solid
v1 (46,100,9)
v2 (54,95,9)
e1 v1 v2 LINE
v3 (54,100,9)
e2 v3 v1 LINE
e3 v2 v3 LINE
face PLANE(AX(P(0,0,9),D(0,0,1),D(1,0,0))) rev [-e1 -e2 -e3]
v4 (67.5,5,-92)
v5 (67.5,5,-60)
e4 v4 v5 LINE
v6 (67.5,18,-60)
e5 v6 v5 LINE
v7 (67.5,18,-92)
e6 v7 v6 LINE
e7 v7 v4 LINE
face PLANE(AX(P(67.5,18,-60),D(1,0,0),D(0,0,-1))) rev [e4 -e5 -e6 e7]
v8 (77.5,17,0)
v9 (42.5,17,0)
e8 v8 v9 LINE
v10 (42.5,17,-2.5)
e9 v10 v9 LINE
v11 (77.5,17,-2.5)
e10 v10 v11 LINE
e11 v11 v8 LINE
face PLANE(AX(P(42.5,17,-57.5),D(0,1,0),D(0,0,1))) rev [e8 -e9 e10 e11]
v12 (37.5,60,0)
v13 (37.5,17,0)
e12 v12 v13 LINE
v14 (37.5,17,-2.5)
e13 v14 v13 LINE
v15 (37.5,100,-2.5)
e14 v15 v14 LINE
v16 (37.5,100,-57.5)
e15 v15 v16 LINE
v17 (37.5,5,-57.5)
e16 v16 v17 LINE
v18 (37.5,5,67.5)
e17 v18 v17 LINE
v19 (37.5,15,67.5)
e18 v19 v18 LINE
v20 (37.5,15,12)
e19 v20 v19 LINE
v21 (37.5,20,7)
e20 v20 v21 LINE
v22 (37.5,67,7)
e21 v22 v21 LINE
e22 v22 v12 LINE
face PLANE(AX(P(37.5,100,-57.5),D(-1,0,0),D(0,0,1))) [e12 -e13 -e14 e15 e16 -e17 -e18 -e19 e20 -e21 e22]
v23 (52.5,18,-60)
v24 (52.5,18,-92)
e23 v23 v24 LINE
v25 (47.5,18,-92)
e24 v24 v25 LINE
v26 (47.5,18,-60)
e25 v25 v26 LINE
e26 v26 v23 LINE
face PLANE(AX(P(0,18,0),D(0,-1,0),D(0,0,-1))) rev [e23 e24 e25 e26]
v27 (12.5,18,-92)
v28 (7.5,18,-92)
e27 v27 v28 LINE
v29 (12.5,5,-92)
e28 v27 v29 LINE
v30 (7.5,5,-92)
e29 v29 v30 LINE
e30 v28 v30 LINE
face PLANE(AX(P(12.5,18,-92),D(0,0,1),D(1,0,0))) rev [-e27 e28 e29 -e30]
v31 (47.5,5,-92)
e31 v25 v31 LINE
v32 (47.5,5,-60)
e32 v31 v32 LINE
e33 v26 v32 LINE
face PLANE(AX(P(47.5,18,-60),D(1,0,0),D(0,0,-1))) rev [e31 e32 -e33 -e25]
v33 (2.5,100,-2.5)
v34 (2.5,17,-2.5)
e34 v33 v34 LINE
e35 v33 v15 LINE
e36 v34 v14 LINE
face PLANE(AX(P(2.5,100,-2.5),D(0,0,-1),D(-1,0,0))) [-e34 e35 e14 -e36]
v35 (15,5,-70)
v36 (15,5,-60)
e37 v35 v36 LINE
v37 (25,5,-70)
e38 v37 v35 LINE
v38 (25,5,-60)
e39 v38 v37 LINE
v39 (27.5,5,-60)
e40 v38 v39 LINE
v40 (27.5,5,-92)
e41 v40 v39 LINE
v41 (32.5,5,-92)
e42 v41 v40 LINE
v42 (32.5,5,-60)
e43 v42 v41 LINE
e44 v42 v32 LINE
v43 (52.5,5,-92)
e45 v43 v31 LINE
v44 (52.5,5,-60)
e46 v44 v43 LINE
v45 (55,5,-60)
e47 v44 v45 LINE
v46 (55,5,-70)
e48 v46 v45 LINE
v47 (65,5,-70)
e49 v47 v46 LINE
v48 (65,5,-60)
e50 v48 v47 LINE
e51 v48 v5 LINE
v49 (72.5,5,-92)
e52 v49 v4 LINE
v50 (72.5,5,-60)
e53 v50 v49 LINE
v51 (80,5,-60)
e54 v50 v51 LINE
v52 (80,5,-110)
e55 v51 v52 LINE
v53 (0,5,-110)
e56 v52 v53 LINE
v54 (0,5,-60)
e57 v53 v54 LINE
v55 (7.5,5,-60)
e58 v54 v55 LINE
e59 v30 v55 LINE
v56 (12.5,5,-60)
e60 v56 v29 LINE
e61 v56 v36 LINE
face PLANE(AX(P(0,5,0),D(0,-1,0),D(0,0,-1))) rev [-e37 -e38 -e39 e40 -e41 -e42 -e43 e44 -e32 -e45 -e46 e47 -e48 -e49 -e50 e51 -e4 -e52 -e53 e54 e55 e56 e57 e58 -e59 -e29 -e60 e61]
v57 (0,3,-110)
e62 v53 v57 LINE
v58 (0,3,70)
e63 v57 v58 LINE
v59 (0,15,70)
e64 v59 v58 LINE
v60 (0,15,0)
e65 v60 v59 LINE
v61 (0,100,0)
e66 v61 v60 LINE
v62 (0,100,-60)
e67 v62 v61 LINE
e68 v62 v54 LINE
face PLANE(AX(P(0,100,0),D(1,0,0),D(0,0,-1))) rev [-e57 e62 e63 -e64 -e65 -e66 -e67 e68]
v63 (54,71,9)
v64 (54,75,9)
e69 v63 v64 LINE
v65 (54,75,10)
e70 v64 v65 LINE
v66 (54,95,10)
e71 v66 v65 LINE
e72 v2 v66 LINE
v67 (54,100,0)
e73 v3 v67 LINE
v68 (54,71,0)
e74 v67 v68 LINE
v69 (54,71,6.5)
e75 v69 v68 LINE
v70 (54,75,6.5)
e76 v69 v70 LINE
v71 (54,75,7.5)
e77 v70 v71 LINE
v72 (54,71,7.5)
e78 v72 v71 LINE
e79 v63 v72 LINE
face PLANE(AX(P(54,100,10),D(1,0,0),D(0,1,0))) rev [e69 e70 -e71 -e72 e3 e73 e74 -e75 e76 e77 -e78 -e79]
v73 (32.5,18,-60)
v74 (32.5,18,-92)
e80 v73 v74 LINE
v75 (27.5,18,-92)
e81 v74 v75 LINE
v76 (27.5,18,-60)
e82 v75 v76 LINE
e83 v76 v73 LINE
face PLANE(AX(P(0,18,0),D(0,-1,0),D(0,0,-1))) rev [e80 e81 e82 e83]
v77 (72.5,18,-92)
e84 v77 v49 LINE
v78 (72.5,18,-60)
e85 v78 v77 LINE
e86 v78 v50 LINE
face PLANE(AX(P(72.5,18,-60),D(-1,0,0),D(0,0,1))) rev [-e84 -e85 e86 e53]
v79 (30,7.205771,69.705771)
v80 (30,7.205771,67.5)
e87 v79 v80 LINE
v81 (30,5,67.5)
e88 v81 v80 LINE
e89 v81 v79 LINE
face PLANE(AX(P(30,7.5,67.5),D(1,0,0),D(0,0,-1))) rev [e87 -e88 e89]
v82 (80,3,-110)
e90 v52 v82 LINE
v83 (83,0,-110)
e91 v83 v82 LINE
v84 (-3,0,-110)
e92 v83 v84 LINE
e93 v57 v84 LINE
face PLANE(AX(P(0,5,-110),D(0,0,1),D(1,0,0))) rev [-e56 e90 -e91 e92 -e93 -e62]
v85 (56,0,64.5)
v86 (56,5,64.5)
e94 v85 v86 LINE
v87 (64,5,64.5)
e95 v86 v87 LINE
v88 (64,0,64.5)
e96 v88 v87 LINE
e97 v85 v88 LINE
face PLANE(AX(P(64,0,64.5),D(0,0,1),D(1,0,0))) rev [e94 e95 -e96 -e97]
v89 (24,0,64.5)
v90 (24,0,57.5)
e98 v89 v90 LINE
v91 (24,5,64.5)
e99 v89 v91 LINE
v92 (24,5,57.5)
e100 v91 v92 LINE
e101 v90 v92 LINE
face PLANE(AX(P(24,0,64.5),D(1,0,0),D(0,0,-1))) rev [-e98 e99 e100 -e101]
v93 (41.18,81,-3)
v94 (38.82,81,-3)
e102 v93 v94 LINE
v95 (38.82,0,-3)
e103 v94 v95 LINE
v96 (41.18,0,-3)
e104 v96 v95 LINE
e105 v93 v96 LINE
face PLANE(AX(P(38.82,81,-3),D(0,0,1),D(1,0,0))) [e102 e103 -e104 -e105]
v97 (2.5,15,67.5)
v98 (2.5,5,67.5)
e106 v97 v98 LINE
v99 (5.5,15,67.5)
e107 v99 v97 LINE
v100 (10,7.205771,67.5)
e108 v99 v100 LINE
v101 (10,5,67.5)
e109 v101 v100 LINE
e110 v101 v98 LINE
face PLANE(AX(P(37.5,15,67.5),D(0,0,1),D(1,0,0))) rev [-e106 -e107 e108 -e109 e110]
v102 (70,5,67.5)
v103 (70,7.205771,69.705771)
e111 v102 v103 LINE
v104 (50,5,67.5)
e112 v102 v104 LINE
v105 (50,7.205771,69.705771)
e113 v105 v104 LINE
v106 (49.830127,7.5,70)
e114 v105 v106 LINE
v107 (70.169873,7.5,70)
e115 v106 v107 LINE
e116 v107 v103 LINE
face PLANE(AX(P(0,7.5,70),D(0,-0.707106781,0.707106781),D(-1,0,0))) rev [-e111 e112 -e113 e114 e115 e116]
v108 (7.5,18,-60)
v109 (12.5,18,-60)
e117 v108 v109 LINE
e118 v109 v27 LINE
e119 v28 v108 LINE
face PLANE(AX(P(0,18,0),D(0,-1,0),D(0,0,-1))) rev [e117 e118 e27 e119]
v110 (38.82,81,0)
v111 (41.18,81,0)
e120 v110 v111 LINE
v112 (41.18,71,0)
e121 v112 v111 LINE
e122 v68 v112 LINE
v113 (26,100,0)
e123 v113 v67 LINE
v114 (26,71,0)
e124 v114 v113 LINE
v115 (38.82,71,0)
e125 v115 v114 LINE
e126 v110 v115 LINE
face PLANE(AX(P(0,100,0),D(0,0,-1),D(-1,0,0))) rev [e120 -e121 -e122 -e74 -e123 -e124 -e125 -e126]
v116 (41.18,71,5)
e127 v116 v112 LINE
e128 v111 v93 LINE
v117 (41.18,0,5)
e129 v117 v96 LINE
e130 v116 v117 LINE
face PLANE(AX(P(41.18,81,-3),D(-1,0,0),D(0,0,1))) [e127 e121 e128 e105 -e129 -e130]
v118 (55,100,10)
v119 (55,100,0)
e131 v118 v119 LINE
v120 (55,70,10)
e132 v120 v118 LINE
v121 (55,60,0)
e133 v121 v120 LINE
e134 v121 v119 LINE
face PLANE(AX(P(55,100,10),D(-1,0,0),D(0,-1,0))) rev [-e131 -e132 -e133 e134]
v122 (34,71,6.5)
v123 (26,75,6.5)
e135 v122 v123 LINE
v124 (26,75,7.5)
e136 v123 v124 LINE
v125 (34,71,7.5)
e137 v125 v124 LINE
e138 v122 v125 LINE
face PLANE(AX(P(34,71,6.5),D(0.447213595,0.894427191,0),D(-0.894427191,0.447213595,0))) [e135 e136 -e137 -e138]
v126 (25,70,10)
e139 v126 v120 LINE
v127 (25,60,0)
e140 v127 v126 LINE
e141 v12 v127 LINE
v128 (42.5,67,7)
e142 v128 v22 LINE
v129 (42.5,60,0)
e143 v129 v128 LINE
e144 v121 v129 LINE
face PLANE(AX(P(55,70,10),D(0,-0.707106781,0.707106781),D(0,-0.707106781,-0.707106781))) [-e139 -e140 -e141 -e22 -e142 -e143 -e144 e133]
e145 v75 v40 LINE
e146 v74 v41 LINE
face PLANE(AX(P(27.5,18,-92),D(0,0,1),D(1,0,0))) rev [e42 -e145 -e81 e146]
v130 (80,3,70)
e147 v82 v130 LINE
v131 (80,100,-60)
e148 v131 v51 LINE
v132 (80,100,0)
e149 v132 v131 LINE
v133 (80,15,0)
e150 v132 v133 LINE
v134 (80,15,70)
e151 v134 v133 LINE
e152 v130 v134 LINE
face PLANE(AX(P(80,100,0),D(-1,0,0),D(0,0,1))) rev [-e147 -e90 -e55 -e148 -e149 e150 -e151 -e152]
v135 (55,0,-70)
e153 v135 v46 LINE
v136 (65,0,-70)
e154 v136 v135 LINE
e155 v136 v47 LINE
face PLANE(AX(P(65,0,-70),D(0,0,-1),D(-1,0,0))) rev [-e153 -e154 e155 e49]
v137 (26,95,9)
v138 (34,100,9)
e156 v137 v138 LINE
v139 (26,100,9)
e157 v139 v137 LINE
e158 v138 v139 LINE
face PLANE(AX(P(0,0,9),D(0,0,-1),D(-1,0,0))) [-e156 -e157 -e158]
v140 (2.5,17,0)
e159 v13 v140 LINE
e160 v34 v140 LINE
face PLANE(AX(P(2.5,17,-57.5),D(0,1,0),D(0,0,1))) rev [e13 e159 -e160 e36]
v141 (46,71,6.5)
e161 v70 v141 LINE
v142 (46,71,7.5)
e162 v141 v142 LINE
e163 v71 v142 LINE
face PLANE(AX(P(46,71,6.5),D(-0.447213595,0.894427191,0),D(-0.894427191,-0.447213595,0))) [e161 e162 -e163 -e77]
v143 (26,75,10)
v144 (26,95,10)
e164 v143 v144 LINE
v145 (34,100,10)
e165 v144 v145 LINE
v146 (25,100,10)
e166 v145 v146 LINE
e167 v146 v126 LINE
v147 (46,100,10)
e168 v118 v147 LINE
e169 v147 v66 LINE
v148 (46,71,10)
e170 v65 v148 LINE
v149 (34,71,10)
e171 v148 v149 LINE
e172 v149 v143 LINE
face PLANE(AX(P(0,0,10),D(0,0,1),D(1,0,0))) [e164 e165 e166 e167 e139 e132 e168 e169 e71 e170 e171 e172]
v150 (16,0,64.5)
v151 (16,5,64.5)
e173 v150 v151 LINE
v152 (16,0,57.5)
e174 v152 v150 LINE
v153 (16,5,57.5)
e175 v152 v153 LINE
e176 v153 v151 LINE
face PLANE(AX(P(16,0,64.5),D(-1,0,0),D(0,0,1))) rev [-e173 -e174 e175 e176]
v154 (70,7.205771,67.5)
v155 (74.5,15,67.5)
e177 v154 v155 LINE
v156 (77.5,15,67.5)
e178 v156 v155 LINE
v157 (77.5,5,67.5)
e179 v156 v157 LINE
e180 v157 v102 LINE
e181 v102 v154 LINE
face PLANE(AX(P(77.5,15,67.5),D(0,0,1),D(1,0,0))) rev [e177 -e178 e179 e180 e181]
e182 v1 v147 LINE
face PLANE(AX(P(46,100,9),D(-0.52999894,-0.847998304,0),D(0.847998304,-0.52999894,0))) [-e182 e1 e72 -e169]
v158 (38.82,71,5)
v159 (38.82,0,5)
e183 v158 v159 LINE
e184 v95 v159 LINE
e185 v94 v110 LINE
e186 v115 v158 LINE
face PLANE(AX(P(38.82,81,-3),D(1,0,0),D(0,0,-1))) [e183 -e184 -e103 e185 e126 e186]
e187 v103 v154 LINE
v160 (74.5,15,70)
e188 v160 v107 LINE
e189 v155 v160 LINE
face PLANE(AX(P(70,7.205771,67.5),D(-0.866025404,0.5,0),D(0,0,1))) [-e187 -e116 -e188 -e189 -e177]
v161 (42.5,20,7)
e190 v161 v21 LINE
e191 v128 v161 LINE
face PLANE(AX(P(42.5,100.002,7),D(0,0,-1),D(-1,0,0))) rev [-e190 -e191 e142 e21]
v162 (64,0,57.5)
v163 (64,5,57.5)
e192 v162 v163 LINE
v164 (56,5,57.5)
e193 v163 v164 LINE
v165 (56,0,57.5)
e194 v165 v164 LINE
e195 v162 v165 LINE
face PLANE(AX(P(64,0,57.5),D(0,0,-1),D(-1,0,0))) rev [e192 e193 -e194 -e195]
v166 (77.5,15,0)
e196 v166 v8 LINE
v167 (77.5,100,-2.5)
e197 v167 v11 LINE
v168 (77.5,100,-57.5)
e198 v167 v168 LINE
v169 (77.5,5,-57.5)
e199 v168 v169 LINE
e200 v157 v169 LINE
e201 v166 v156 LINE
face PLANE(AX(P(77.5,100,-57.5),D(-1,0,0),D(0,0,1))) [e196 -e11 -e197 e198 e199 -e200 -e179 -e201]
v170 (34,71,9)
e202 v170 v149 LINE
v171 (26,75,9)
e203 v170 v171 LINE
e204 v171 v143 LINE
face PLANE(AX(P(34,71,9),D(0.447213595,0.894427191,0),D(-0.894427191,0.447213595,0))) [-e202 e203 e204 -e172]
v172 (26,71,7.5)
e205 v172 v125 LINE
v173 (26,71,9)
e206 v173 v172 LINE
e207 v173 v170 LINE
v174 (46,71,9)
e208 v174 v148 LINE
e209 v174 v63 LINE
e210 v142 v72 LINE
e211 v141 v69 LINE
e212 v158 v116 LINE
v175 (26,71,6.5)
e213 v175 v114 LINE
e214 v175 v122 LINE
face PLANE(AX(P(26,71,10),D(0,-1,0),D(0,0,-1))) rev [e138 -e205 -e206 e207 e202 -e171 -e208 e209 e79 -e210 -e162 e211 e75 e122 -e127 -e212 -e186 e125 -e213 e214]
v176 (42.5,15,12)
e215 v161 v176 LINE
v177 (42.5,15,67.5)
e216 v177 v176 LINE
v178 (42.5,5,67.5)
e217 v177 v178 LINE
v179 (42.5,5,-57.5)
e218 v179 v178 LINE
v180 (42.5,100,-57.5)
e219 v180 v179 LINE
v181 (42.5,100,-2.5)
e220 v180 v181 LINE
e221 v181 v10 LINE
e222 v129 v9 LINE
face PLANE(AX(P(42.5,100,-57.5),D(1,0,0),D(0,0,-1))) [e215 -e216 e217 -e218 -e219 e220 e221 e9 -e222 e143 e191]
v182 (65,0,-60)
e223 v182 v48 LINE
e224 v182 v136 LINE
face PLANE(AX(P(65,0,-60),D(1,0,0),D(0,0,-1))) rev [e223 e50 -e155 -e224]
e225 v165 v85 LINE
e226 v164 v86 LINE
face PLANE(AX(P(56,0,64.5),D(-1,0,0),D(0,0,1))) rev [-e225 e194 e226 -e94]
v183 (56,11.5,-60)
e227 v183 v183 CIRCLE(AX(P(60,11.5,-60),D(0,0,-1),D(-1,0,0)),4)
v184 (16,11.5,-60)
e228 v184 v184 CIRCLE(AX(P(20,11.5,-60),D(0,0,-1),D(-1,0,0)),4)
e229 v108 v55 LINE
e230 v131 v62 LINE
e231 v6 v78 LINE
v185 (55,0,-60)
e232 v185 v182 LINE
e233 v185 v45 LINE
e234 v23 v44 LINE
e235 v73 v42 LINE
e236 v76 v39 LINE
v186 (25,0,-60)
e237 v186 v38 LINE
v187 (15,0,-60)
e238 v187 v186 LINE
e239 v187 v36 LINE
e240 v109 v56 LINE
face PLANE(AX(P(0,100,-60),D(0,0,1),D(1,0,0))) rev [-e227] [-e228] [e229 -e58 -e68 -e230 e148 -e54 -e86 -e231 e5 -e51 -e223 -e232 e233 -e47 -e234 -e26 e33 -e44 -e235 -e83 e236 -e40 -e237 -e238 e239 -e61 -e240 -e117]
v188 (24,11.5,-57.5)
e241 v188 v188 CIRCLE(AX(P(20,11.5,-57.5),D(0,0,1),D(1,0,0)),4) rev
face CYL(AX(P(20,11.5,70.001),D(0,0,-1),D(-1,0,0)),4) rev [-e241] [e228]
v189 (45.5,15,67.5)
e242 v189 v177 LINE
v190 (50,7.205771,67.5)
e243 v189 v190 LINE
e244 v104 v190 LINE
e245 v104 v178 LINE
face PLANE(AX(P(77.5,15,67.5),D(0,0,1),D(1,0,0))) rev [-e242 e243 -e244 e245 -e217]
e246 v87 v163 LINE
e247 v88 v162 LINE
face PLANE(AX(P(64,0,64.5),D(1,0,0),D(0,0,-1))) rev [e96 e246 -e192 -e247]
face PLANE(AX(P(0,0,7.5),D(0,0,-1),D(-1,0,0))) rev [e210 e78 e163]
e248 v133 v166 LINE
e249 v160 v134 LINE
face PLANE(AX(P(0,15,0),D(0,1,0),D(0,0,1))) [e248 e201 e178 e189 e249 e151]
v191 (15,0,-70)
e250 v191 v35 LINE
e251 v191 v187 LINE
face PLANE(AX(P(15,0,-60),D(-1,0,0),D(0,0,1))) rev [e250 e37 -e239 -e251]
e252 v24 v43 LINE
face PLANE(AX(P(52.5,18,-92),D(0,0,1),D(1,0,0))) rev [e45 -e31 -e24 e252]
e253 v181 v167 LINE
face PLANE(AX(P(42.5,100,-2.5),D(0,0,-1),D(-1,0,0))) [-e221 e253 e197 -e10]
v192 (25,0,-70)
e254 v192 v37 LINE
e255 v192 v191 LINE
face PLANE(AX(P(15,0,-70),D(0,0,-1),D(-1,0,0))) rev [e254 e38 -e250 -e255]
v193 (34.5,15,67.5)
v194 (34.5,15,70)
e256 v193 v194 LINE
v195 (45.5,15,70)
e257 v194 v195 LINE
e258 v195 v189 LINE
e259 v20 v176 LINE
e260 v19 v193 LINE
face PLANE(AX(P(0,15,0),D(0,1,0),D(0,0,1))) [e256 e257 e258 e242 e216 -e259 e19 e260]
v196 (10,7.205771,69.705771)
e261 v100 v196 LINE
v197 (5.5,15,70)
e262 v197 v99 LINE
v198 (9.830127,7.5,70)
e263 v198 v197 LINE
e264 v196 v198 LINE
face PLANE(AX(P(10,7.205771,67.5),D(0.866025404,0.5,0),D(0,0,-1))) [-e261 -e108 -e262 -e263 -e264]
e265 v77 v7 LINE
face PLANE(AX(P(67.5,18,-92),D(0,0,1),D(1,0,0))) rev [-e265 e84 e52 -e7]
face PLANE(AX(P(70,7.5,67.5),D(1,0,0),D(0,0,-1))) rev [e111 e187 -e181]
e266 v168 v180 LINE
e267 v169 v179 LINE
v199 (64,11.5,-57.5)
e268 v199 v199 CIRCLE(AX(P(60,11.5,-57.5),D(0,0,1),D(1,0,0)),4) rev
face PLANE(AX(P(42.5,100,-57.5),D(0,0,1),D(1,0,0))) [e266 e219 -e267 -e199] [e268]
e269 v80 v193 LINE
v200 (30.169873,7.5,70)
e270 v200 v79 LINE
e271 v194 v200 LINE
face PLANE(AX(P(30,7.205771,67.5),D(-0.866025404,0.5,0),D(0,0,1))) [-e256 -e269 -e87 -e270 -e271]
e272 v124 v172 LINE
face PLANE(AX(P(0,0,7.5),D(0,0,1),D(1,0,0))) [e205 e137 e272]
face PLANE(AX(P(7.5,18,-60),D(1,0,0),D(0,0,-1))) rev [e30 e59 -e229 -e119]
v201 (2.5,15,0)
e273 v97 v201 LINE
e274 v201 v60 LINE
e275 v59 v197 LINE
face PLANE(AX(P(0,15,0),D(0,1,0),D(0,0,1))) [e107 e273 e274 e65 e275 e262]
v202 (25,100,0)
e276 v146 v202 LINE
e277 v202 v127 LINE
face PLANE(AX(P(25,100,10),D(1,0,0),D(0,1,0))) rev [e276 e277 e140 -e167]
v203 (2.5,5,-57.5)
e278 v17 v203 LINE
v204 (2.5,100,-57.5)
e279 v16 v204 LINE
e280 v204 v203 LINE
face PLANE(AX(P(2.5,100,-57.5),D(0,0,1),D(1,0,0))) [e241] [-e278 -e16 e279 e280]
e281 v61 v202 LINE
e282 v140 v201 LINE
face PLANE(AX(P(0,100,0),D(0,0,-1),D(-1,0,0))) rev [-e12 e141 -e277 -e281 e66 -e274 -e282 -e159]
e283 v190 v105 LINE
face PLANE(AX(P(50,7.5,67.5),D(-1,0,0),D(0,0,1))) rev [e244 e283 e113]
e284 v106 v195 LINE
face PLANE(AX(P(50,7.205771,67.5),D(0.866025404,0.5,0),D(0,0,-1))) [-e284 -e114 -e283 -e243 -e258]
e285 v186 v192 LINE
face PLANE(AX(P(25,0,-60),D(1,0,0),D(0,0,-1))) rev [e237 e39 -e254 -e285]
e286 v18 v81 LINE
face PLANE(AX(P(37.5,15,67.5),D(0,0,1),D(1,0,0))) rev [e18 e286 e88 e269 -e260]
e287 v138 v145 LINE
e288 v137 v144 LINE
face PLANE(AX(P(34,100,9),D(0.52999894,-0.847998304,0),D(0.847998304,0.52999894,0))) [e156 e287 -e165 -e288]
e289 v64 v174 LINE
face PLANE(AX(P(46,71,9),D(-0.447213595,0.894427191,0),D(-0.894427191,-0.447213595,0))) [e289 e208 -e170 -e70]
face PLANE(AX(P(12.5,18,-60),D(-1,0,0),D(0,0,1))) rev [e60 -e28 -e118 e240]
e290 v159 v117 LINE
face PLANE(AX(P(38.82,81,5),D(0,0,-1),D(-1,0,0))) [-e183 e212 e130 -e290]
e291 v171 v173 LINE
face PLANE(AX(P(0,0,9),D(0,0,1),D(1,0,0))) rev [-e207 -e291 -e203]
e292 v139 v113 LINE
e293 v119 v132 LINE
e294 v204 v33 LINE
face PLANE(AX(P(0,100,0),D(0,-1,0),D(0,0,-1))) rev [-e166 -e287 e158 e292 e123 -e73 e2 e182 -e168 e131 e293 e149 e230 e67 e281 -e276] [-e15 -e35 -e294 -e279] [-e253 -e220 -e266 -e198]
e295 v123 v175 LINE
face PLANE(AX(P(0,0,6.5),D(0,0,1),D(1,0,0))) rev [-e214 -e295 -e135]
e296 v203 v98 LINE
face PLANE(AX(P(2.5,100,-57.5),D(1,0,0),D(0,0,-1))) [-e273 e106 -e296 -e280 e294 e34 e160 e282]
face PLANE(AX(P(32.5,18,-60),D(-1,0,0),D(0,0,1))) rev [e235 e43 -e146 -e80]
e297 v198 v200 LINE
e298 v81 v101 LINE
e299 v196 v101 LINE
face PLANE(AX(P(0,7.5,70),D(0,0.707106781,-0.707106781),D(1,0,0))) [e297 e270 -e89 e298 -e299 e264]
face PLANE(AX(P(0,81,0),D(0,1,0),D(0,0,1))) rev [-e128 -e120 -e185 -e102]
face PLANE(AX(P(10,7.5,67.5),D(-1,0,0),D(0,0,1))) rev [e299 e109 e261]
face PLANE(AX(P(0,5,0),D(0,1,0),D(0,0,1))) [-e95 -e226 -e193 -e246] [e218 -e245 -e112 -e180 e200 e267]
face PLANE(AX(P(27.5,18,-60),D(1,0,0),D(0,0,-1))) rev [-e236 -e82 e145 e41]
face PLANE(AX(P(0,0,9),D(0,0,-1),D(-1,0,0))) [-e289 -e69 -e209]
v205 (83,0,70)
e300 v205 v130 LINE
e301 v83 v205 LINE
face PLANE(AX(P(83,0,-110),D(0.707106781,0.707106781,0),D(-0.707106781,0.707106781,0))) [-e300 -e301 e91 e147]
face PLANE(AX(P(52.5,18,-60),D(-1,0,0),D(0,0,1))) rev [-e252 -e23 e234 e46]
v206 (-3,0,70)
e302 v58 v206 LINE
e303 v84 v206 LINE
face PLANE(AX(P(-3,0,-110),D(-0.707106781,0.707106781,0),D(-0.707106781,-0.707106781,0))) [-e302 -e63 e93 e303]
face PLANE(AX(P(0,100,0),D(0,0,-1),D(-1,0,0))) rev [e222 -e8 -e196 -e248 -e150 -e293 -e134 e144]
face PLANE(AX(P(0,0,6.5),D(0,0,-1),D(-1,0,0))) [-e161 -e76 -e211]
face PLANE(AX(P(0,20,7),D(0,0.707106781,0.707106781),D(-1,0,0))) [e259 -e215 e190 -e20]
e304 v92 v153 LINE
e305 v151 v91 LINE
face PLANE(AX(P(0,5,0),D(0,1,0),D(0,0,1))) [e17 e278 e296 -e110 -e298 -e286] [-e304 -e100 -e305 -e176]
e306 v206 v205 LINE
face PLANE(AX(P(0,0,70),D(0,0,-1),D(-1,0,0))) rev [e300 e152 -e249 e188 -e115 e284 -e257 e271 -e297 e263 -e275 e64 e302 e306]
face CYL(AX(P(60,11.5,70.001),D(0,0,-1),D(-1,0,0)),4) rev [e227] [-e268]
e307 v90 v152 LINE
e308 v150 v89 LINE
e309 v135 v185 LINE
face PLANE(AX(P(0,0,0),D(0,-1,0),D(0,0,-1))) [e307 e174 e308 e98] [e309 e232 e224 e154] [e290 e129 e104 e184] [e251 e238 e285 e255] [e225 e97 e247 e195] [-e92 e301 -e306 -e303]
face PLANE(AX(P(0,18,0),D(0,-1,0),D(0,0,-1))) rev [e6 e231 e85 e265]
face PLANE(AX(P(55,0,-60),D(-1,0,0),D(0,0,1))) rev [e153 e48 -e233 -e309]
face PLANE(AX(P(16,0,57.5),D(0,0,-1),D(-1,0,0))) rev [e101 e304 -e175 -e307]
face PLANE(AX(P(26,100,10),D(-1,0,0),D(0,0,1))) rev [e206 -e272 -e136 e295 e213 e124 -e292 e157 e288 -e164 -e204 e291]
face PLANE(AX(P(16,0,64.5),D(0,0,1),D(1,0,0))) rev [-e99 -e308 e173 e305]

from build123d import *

# Parameters (mm, degrees)
SKETCH1_W                                 = 80
SKETCH1_H                                 = 60
BOSS_EXTRUDE1_DEPTH                       = 100
CUT_EXTRUDE1_START                        = 5
SKETCH2_W                                 = 35
SKETCH2_H                                 = 55
CUT_EXTRUDE1_DEPTH                        = 95
SKETCH3_W                                 = 80
SKETCH3_H                                 = 5
BOSS_EXTRUDE2_DEPTH                       = 70
BOSS_EXTRUDE3_DEPTH                       = 10
SKETCH5_W                                 = 20
SKETCH5_H                                 = 2.5
CUT_EXTRUDE2_DEPTH                        = 7.5
SKETCH6_W                                 = 35
SKETCH6_H                                 = 12
CUT_EXTRUDE4_DEPTH                        = 57.5
CUT_EXTRUDE6_REACH                        = 184.483
SKETCH7_R                                 = 4
SKETCH9_W                                 = 80
SKETCH9_H                                 = 50
BOSS_EXTRUDE4_DEPTH                       = 5
SKETCH13_W                                = 8
SKETCH13_H                                = 7
CUT_EXTRUDE8_BUTTON_HOLES_DEPTH           = 166.90660023
BOSS_EXTRUDE5_OLED_MOUNT_DEPTH            = 10
BOSS_EXTRUDE6_OLED_MOUNT_DEPTH            = 1
BOSS_EXTRUDE7_START                       = -2.5
BOSS_EXTRUDE7_OLED_MOUNT_DEPTH            = 1
BOSS_EXTRUDE8_OLED_MOUNT_DEPTH            = 1
BOSS_EXTRUDE13_OLED_MOUNT_SUPPORT_DEPTH   = 30
CUT_EXTRUDE9_OLED_CABLE_DEPTH             = 10
CUT_EXTRUDE9_OLED_CABLE_DEPTH_BACK        = 154.430766146
SKETCH18_W                                = 2.36
SKETCH18_H                                = 8
BOSS_EXTRUDE12_OLED_CABLE_GUIDE_REACH     = 162.39
SKETCH20_W                                = 10
SKETCH20_H                                = 10
CUT_EXTRUDE10_SOLENOID_WIRE_HOLE_DEPTH    = 166.90660023
SKETCH21_W                                = 5
SKETCH21_H                                = 32
BOSS_EXTRUDE9_SOLENOID_SIDE_SUPPORT_DEPTH = 13
CHAMFER3_THUMB_SIZE                       = 2.5
CHAMFER5_THUMB_SIZE                       = 4.5
CHAMFER5_THUMB_SIZE2                      = 7.794228634
CHAMFER5_THUMB_PART_2_SIZE                = 4.5
CHAMFER5_THUMB_PART_2_SIZE2               = 7.794228634
CHAMFER5_THUMB_PART_3_SIZE                = 4.5
CHAMFER5_THUMB_PART_3_SIZE2               = 7.794228634
BOSS_EXTRUDE5_GUIDE_DEPTH                 = 180
SKETCH49_W                                = 5
SKETCH49_H                                = 5
BOSS_EXTRUDE14_DEPTH                      = 5
CHAMFER8_SIZE                             = 5


with BuildPart() as part:
    # Sketch1 → Boss-Extrude1 (new body)
    with BuildSketch(Plane(origin=(0, 0, 0), x_dir=(1, 0, 0), z_dir=(0, 1, 0))):
        with Locations((40, 30)):
            Rectangle(SKETCH1_W, SKETCH1_H)
    extrude(amount=BOSS_EXTRUDE1_DEPTH)

    # Sketch2 → Cut-Extrude1 (cut)
    with BuildSketch(Plane(origin=(0, 0, 0), x_dir=(1, 0, 0), z_dir=(0, 1, 0)).offset(CUT_EXTRUDE1_START)):
        with Locations((20, 30)):
            Rectangle(SKETCH2_W, SKETCH2_H)
        with Locations((60, 30)):
            Rectangle(SKETCH2_W, SKETCH2_H)
    extrude(amount=CUT_EXTRUDE1_DEPTH, mode=Mode.SUBTRACT)

    # Sketch3 → Boss-Extrude2 (add)
    with BuildSketch(Plane.XY):
        with Locations((40, 2.5)):
            Rectangle(SKETCH3_W, SKETCH3_H)
    extrude(amount=BOSS_EXTRUDE2_DEPTH)

    # Sketch4 → Boss-Extrude3 (add)
    with BuildSketch(Plane(origin=(0, 5, 0), x_dir=(1, 0, 0), z_dir=(0, 1, 0))):
        Polygon((80, 0), (77.5, 0), (77.5, -67.5), (42.5, -67.5), (42.5, 0), (37.5, 0), (37.5, -67.5), (2.5, -67.5), (2.5, 0), (0, 0), (0, -70), (80, -70), align=None)
    extrude(amount=BOSS_EXTRUDE3_DEPTH)

    # Sketch5 → Cut-Extrude2 (cut)
    with BuildSketch(Plane(origin=(0, 15, 0), x_dir=(1, 0, 0), z_dir=(0, 1, 0))):
        with Locations((20, -68.75)):
            Rectangle(SKETCH5_W, SKETCH5_H)
        with Locations((60, -68.75)):
            Rectangle(SKETCH5_W, SKETCH5_H)
    extrude(amount=-CUT_EXTRUDE2_DEPTH, mode=Mode.SUBTRACT)

    # Sketch6 → Cut-Extrude4 (cut)
    with BuildSketch(Plane.XY):
        with Locations((20, 11)):
            Rectangle(SKETCH6_W, SKETCH6_H)
        with Locations((60, 11)):
            Rectangle(SKETCH6_W, SKETCH6_H)
    extrude(amount=-CUT_EXTRUDE4_DEPTH, mode=Mode.SUBTRACT)

    # Sketch7 → Cut-Extrude6 (cut, up to next)
    with BuildSketch(Plane(origin=(0, 0, -60), x_dir=(-1, 0, 0), z_dir=(0, 0, -1)), mode=Mode.PRIVATE) as cut_extrude6_sk1:
        with Locations((-20, 11.5)):
            Circle(SKETCH7_R)
    cut_extrude6_tool1 = extrude(cut_extrude6_sk1.sketch, amount=-CUT_EXTRUDE6_REACH, mode=Mode.PRIVATE) & part.part
    # Sketch7 → Cut-Extrude6 (cut, up to next)
    with BuildSketch(Plane(origin=(0, 0, -60), x_dir=(-1, 0, 0), z_dir=(0, 0, -1)), mode=Mode.PRIVATE) as cut_extrude6_sk2:
        with Locations((-60, 11.5)):
            Circle(SKETCH7_R)
    cut_extrude6_tool2 = extrude(cut_extrude6_sk2.sketch, amount=-CUT_EXTRUDE6_REACH, mode=Mode.PRIVATE) & part.part
    add(cut_extrude6_tool1.solids().sort_by_distance((20, 11.5, -60))[0], mode=Mode.SUBTRACT)
    add(cut_extrude6_tool2.solids().sort_by_distance((60, 11.5, -60))[0], mode=Mode.SUBTRACT)

    # Sketch9 → Boss-Extrude4 (add)
    with BuildSketch(Plane(origin=(0, 0, 0), x_dir=(1, 0, 0), z_dir=(0, 1, 0))):
        with Locations((40, 85)):
            Rectangle(SKETCH9_W, SKETCH9_H)
    extrude(amount=BOSS_EXTRUDE4_DEPTH)

    # Sketch13 → Cut-Extrude8 (Button Holes) (cut, through all)
    with BuildSketch(Plane(origin=(0, 5, 0), x_dir=(1, 0, 0), z_dir=(0, 1, 0))):
        with Locations((20, -61)):
            Rectangle(SKETCH13_W, SKETCH13_H)
        with Locations((60, -61)):
            Rectangle(SKETCH13_W, SKETCH13_H)
    extrude(amount=-CUT_EXTRUDE8_BUTTON_HOLES_DEPTH, mode=Mode.SUBTRACT)

    # Sketch14 → Boss-Extrude5 (OLED Mount) (add)
    with BuildSketch(Plane.XY):
        Polygon((25, 100), (26, 100), (26, 71), (54, 71), (54, 100), (55, 100), (55, 70), (54, 70), (26, 70), (25, 70), align=None)
    extrude(amount=BOSS_EXTRUDE5_OLED_MOUNT_DEPTH)

    # Sketch15 → Boss-Extrude6 (OLED Mount) (add)
    with BuildSketch(Plane.XY.offset(10)):
        Polygon((26, 71), (34, 71), (26, 75), align=None)
        Polygon((54, 75), (54, 71), (46, 71), align=None)
    extrude(amount=-BOSS_EXTRUDE6_OLED_MOUNT_DEPTH)

    # Sketch15<2> → Boss-Extrude7 (OLED Mount) (add)
    with BuildSketch(Plane.XY.offset(10).offset(BOSS_EXTRUDE7_START)):
        Polygon((26, 71), (34, 71), (26, 75), align=None)
        Polygon((54, 75), (54, 71), (46, 71), align=None)
    extrude(amount=-BOSS_EXTRUDE7_OLED_MOUNT_DEPTH)

    # Sketch17 → Boss-Extrude8 (OLED Mount) (add)
    with BuildSketch(Plane.XY.offset(10)):
        Polygon((54, 95), (54, 100), (46, 100), align=None)
        Polygon((26, 100), (34, 100), (26, 95), align=None)
    extrude(amount=-BOSS_EXTRUDE8_OLED_MOUNT_DEPTH)

    # Sketch32 → Boss-Extrude13 OLED Mount Support) (add)
    with BuildSketch(Plane.ZY.offset(-25)):
        Polygon((0, 70), (10, 70), (0, 60), align=None)
    extrude(amount=-BOSS_EXTRUDE13_OLED_MOUNT_SUPPORT_DEPTH)

    # Sketch18 → Cut-Extrude9 (OLED Cable) (cut, two sides: drawn at the far end of the back side and taken through both)
    with BuildSketch(Plane(origin=(0, 71, 0), x_dir=(1, 0, 0), z_dir=(0, 1, 0)).offset(-CUT_EXTRUDE9_OLED_CABLE_DEPTH_BACK)):
        with Locations((40, -1)):
            Rectangle(SKETCH18_W, SKETCH18_H)
    extrude(amount=CUT_EXTRUDE9_OLED_CABLE_DEPTH + CUT_EXTRUDE9_OLED_CABLE_DEPTH_BACK, mode=Mode.SUBTRACT)

    # Boss-Extrude12 (OLED Cable Guide): up to this plane
    boss_extrude12_oled_cable_guide_end = Plane(origin=(55, 70, 10), z_dir=(0, -0.7071067811865477, 0.7071067811865474))
    # Sketch31 → Boss-Extrude12 (OLED Cable Guide) (add, up to the surface)
    with BuildSketch(Plane(origin=(0, 15, 0), x_dir=(1, 0, 0), z_dir=(0, 1, 0)), mode=Mode.PRIVATE) as boss_extrude12_oled_cable_guide_sk1:
        Polygon((37.5, 0), (38.82, 0), (38.82, -5), (41.18, -5), (41.18, 0), (42.5, 0), (42.5, -7), (37.5, -7), align=None)
    boss_extrude12_oled_cable_guide_tool1 = split(extrude(boss_extrude12_oled_cable_guide_sk1.sketch, amount=BOSS_EXTRUDE12_OLED_CABLE_GUIDE_REACH, mode=Mode.PRIVATE), bisect_by=boss_extrude12_oled_cable_guide_end, keep=Keep.BOTH, mode=Mode.PRIVATE)
    add(boss_extrude12_oled_cable_guide_tool1.solids().sort_by_distance((38.16, 15, 0.086023))[0])

    # Sketch20 → Cut-Extrude10 (Solenoid Wire Hole) (cut, through all)
    with BuildSketch(Plane(origin=(0, 5, 0), x_dir=(1, 0, 0), z_dir=(0, 1, 0))):
        with Locations((60, 65)):
            Rectangle(SKETCH20_W, SKETCH20_H)
        with Locations((20, 65)):
            Rectangle(SKETCH20_W, SKETCH20_H)
    extrude(amount=-CUT_EXTRUDE10_SOLENOID_WIRE_HOLE_DEPTH, mode=Mode.SUBTRACT)

    # Sketch21 → Boss-Extrude9 (Solenoid Side Support) (add)
    with BuildSketch(Plane(origin=(0, 5, 0), x_dir=(1, 0, 0), z_dir=(0, 1, 0))):
        with Locations((70, 76)):
            Rectangle(SKETCH21_W, SKETCH21_H)
        with Locations((50, 76)):
            Rectangle(SKETCH21_W, SKETCH21_H)
        with Locations((30, 76)):
            Rectangle(SKETCH21_W, SKETCH21_H)
        with Locations((10, 76)):
            Rectangle(SKETCH21_W, SKETCH21_H)
    extrude(amount=BOSS_EXTRUDE9_SOLENOID_SIDE_SUPPORT_DEPTH)

    # Chamfer3 (Thumb)
    chamfer3_thumb_edges = [part.edges().sort_by_distance(p)[0] for p in [
        (20, 7.5, 67.5),
        (60, 7.5, 67.5),
    ]]
    chamfer(chamfer3_thumb_edges, length=CHAMFER3_THUMB_SIZE - 0.0001)  # a hair under: the kernel refuses the full size

    # Chamfer5 (Thumb)
    chamfer5_thumb_edges = [part.edges().sort_by_distance(p)[0] for p in [
        (70, 15, 68.75),
    ]]
    chamfer5_thumb_side = [part.faces().sort_by_distance(p)[0] for p in [
        (78.266129032, 15, 38.266129032),
    ]]
    chamfer(chamfer5_thumb_edges, length=CHAMFER5_THUMB_SIZE, length2=CHAMFER5_THUMB_SIZE2, reference=chamfer5_thumb_side[0])

    # Chamfer5 (Thumb) part 2
    chamfer5_thumb_part_2_edges = [part.edges().sort_by_distance(p)[0] for p in [
        (50, 15, 68.75),
        (30, 15, 68.75),
    ]]
    chamfer5_thumb_part_2_side = [part.faces().sort_by_distance(p)[0] for p in [
        (40, 15, 41.718085106),
    ]]
    chamfer(chamfer5_thumb_part_2_edges, length=CHAMFER5_THUMB_PART_2_SIZE, length2=CHAMFER5_THUMB_PART_2_SIZE2, reference=chamfer5_thumb_part_2_side[0])

    # Chamfer5 (Thumb) part 3
    chamfer5_thumb_part_3_edges = [part.edges().sort_by_distance(p)[0] for p in [
        (10, 15, 68.75),
    ]]
    chamfer5_thumb_part_3_side = [part.faces().sort_by_distance(p)[0] for p in [
        (1.733870968, 15, 38.266129032),
    ]]
    chamfer(chamfer5_thumb_part_3_edges, length=CHAMFER5_THUMB_PART_3_SIZE, length2=CHAMFER5_THUMB_PART_3_SIZE2, reference=chamfer5_thumb_part_3_side[0])

    # Sketch37 → Boss-Extrude5 (Guide) (add, through all)
    with BuildSketch(Plane.XY.offset(70)):
        Polygon((80, 0), (83, 0), (80, 3), align=None)
        Polygon((0, 0), (-3, 0), (0, 3), align=None)
    extrude(amount=-BOSS_EXTRUDE5_GUIDE_DEPTH)

    # Sketch49 → Boss-Extrude14 (add)
    with BuildSketch(Plane(origin=(0, 15, 0), x_dir=(1, 0, 0), z_dir=(0, 1, 0))):
        with Locations((40, -9.5)):
            Rectangle(SKETCH49_W, SKETCH49_H)
    extrude(amount=BOSS_EXTRUDE14_DEPTH)

    # Chamfer8
    chamfer8_edges = [part.edges().sort_by_distance(p)[0] for p in [
        (40, 20, 12),
    ]]
    chamfer(chamfer8_edges, length=CHAMFER8_SIZE - 0.0001)  # a hair under: the kernel refuses the full size


solid = part.part
